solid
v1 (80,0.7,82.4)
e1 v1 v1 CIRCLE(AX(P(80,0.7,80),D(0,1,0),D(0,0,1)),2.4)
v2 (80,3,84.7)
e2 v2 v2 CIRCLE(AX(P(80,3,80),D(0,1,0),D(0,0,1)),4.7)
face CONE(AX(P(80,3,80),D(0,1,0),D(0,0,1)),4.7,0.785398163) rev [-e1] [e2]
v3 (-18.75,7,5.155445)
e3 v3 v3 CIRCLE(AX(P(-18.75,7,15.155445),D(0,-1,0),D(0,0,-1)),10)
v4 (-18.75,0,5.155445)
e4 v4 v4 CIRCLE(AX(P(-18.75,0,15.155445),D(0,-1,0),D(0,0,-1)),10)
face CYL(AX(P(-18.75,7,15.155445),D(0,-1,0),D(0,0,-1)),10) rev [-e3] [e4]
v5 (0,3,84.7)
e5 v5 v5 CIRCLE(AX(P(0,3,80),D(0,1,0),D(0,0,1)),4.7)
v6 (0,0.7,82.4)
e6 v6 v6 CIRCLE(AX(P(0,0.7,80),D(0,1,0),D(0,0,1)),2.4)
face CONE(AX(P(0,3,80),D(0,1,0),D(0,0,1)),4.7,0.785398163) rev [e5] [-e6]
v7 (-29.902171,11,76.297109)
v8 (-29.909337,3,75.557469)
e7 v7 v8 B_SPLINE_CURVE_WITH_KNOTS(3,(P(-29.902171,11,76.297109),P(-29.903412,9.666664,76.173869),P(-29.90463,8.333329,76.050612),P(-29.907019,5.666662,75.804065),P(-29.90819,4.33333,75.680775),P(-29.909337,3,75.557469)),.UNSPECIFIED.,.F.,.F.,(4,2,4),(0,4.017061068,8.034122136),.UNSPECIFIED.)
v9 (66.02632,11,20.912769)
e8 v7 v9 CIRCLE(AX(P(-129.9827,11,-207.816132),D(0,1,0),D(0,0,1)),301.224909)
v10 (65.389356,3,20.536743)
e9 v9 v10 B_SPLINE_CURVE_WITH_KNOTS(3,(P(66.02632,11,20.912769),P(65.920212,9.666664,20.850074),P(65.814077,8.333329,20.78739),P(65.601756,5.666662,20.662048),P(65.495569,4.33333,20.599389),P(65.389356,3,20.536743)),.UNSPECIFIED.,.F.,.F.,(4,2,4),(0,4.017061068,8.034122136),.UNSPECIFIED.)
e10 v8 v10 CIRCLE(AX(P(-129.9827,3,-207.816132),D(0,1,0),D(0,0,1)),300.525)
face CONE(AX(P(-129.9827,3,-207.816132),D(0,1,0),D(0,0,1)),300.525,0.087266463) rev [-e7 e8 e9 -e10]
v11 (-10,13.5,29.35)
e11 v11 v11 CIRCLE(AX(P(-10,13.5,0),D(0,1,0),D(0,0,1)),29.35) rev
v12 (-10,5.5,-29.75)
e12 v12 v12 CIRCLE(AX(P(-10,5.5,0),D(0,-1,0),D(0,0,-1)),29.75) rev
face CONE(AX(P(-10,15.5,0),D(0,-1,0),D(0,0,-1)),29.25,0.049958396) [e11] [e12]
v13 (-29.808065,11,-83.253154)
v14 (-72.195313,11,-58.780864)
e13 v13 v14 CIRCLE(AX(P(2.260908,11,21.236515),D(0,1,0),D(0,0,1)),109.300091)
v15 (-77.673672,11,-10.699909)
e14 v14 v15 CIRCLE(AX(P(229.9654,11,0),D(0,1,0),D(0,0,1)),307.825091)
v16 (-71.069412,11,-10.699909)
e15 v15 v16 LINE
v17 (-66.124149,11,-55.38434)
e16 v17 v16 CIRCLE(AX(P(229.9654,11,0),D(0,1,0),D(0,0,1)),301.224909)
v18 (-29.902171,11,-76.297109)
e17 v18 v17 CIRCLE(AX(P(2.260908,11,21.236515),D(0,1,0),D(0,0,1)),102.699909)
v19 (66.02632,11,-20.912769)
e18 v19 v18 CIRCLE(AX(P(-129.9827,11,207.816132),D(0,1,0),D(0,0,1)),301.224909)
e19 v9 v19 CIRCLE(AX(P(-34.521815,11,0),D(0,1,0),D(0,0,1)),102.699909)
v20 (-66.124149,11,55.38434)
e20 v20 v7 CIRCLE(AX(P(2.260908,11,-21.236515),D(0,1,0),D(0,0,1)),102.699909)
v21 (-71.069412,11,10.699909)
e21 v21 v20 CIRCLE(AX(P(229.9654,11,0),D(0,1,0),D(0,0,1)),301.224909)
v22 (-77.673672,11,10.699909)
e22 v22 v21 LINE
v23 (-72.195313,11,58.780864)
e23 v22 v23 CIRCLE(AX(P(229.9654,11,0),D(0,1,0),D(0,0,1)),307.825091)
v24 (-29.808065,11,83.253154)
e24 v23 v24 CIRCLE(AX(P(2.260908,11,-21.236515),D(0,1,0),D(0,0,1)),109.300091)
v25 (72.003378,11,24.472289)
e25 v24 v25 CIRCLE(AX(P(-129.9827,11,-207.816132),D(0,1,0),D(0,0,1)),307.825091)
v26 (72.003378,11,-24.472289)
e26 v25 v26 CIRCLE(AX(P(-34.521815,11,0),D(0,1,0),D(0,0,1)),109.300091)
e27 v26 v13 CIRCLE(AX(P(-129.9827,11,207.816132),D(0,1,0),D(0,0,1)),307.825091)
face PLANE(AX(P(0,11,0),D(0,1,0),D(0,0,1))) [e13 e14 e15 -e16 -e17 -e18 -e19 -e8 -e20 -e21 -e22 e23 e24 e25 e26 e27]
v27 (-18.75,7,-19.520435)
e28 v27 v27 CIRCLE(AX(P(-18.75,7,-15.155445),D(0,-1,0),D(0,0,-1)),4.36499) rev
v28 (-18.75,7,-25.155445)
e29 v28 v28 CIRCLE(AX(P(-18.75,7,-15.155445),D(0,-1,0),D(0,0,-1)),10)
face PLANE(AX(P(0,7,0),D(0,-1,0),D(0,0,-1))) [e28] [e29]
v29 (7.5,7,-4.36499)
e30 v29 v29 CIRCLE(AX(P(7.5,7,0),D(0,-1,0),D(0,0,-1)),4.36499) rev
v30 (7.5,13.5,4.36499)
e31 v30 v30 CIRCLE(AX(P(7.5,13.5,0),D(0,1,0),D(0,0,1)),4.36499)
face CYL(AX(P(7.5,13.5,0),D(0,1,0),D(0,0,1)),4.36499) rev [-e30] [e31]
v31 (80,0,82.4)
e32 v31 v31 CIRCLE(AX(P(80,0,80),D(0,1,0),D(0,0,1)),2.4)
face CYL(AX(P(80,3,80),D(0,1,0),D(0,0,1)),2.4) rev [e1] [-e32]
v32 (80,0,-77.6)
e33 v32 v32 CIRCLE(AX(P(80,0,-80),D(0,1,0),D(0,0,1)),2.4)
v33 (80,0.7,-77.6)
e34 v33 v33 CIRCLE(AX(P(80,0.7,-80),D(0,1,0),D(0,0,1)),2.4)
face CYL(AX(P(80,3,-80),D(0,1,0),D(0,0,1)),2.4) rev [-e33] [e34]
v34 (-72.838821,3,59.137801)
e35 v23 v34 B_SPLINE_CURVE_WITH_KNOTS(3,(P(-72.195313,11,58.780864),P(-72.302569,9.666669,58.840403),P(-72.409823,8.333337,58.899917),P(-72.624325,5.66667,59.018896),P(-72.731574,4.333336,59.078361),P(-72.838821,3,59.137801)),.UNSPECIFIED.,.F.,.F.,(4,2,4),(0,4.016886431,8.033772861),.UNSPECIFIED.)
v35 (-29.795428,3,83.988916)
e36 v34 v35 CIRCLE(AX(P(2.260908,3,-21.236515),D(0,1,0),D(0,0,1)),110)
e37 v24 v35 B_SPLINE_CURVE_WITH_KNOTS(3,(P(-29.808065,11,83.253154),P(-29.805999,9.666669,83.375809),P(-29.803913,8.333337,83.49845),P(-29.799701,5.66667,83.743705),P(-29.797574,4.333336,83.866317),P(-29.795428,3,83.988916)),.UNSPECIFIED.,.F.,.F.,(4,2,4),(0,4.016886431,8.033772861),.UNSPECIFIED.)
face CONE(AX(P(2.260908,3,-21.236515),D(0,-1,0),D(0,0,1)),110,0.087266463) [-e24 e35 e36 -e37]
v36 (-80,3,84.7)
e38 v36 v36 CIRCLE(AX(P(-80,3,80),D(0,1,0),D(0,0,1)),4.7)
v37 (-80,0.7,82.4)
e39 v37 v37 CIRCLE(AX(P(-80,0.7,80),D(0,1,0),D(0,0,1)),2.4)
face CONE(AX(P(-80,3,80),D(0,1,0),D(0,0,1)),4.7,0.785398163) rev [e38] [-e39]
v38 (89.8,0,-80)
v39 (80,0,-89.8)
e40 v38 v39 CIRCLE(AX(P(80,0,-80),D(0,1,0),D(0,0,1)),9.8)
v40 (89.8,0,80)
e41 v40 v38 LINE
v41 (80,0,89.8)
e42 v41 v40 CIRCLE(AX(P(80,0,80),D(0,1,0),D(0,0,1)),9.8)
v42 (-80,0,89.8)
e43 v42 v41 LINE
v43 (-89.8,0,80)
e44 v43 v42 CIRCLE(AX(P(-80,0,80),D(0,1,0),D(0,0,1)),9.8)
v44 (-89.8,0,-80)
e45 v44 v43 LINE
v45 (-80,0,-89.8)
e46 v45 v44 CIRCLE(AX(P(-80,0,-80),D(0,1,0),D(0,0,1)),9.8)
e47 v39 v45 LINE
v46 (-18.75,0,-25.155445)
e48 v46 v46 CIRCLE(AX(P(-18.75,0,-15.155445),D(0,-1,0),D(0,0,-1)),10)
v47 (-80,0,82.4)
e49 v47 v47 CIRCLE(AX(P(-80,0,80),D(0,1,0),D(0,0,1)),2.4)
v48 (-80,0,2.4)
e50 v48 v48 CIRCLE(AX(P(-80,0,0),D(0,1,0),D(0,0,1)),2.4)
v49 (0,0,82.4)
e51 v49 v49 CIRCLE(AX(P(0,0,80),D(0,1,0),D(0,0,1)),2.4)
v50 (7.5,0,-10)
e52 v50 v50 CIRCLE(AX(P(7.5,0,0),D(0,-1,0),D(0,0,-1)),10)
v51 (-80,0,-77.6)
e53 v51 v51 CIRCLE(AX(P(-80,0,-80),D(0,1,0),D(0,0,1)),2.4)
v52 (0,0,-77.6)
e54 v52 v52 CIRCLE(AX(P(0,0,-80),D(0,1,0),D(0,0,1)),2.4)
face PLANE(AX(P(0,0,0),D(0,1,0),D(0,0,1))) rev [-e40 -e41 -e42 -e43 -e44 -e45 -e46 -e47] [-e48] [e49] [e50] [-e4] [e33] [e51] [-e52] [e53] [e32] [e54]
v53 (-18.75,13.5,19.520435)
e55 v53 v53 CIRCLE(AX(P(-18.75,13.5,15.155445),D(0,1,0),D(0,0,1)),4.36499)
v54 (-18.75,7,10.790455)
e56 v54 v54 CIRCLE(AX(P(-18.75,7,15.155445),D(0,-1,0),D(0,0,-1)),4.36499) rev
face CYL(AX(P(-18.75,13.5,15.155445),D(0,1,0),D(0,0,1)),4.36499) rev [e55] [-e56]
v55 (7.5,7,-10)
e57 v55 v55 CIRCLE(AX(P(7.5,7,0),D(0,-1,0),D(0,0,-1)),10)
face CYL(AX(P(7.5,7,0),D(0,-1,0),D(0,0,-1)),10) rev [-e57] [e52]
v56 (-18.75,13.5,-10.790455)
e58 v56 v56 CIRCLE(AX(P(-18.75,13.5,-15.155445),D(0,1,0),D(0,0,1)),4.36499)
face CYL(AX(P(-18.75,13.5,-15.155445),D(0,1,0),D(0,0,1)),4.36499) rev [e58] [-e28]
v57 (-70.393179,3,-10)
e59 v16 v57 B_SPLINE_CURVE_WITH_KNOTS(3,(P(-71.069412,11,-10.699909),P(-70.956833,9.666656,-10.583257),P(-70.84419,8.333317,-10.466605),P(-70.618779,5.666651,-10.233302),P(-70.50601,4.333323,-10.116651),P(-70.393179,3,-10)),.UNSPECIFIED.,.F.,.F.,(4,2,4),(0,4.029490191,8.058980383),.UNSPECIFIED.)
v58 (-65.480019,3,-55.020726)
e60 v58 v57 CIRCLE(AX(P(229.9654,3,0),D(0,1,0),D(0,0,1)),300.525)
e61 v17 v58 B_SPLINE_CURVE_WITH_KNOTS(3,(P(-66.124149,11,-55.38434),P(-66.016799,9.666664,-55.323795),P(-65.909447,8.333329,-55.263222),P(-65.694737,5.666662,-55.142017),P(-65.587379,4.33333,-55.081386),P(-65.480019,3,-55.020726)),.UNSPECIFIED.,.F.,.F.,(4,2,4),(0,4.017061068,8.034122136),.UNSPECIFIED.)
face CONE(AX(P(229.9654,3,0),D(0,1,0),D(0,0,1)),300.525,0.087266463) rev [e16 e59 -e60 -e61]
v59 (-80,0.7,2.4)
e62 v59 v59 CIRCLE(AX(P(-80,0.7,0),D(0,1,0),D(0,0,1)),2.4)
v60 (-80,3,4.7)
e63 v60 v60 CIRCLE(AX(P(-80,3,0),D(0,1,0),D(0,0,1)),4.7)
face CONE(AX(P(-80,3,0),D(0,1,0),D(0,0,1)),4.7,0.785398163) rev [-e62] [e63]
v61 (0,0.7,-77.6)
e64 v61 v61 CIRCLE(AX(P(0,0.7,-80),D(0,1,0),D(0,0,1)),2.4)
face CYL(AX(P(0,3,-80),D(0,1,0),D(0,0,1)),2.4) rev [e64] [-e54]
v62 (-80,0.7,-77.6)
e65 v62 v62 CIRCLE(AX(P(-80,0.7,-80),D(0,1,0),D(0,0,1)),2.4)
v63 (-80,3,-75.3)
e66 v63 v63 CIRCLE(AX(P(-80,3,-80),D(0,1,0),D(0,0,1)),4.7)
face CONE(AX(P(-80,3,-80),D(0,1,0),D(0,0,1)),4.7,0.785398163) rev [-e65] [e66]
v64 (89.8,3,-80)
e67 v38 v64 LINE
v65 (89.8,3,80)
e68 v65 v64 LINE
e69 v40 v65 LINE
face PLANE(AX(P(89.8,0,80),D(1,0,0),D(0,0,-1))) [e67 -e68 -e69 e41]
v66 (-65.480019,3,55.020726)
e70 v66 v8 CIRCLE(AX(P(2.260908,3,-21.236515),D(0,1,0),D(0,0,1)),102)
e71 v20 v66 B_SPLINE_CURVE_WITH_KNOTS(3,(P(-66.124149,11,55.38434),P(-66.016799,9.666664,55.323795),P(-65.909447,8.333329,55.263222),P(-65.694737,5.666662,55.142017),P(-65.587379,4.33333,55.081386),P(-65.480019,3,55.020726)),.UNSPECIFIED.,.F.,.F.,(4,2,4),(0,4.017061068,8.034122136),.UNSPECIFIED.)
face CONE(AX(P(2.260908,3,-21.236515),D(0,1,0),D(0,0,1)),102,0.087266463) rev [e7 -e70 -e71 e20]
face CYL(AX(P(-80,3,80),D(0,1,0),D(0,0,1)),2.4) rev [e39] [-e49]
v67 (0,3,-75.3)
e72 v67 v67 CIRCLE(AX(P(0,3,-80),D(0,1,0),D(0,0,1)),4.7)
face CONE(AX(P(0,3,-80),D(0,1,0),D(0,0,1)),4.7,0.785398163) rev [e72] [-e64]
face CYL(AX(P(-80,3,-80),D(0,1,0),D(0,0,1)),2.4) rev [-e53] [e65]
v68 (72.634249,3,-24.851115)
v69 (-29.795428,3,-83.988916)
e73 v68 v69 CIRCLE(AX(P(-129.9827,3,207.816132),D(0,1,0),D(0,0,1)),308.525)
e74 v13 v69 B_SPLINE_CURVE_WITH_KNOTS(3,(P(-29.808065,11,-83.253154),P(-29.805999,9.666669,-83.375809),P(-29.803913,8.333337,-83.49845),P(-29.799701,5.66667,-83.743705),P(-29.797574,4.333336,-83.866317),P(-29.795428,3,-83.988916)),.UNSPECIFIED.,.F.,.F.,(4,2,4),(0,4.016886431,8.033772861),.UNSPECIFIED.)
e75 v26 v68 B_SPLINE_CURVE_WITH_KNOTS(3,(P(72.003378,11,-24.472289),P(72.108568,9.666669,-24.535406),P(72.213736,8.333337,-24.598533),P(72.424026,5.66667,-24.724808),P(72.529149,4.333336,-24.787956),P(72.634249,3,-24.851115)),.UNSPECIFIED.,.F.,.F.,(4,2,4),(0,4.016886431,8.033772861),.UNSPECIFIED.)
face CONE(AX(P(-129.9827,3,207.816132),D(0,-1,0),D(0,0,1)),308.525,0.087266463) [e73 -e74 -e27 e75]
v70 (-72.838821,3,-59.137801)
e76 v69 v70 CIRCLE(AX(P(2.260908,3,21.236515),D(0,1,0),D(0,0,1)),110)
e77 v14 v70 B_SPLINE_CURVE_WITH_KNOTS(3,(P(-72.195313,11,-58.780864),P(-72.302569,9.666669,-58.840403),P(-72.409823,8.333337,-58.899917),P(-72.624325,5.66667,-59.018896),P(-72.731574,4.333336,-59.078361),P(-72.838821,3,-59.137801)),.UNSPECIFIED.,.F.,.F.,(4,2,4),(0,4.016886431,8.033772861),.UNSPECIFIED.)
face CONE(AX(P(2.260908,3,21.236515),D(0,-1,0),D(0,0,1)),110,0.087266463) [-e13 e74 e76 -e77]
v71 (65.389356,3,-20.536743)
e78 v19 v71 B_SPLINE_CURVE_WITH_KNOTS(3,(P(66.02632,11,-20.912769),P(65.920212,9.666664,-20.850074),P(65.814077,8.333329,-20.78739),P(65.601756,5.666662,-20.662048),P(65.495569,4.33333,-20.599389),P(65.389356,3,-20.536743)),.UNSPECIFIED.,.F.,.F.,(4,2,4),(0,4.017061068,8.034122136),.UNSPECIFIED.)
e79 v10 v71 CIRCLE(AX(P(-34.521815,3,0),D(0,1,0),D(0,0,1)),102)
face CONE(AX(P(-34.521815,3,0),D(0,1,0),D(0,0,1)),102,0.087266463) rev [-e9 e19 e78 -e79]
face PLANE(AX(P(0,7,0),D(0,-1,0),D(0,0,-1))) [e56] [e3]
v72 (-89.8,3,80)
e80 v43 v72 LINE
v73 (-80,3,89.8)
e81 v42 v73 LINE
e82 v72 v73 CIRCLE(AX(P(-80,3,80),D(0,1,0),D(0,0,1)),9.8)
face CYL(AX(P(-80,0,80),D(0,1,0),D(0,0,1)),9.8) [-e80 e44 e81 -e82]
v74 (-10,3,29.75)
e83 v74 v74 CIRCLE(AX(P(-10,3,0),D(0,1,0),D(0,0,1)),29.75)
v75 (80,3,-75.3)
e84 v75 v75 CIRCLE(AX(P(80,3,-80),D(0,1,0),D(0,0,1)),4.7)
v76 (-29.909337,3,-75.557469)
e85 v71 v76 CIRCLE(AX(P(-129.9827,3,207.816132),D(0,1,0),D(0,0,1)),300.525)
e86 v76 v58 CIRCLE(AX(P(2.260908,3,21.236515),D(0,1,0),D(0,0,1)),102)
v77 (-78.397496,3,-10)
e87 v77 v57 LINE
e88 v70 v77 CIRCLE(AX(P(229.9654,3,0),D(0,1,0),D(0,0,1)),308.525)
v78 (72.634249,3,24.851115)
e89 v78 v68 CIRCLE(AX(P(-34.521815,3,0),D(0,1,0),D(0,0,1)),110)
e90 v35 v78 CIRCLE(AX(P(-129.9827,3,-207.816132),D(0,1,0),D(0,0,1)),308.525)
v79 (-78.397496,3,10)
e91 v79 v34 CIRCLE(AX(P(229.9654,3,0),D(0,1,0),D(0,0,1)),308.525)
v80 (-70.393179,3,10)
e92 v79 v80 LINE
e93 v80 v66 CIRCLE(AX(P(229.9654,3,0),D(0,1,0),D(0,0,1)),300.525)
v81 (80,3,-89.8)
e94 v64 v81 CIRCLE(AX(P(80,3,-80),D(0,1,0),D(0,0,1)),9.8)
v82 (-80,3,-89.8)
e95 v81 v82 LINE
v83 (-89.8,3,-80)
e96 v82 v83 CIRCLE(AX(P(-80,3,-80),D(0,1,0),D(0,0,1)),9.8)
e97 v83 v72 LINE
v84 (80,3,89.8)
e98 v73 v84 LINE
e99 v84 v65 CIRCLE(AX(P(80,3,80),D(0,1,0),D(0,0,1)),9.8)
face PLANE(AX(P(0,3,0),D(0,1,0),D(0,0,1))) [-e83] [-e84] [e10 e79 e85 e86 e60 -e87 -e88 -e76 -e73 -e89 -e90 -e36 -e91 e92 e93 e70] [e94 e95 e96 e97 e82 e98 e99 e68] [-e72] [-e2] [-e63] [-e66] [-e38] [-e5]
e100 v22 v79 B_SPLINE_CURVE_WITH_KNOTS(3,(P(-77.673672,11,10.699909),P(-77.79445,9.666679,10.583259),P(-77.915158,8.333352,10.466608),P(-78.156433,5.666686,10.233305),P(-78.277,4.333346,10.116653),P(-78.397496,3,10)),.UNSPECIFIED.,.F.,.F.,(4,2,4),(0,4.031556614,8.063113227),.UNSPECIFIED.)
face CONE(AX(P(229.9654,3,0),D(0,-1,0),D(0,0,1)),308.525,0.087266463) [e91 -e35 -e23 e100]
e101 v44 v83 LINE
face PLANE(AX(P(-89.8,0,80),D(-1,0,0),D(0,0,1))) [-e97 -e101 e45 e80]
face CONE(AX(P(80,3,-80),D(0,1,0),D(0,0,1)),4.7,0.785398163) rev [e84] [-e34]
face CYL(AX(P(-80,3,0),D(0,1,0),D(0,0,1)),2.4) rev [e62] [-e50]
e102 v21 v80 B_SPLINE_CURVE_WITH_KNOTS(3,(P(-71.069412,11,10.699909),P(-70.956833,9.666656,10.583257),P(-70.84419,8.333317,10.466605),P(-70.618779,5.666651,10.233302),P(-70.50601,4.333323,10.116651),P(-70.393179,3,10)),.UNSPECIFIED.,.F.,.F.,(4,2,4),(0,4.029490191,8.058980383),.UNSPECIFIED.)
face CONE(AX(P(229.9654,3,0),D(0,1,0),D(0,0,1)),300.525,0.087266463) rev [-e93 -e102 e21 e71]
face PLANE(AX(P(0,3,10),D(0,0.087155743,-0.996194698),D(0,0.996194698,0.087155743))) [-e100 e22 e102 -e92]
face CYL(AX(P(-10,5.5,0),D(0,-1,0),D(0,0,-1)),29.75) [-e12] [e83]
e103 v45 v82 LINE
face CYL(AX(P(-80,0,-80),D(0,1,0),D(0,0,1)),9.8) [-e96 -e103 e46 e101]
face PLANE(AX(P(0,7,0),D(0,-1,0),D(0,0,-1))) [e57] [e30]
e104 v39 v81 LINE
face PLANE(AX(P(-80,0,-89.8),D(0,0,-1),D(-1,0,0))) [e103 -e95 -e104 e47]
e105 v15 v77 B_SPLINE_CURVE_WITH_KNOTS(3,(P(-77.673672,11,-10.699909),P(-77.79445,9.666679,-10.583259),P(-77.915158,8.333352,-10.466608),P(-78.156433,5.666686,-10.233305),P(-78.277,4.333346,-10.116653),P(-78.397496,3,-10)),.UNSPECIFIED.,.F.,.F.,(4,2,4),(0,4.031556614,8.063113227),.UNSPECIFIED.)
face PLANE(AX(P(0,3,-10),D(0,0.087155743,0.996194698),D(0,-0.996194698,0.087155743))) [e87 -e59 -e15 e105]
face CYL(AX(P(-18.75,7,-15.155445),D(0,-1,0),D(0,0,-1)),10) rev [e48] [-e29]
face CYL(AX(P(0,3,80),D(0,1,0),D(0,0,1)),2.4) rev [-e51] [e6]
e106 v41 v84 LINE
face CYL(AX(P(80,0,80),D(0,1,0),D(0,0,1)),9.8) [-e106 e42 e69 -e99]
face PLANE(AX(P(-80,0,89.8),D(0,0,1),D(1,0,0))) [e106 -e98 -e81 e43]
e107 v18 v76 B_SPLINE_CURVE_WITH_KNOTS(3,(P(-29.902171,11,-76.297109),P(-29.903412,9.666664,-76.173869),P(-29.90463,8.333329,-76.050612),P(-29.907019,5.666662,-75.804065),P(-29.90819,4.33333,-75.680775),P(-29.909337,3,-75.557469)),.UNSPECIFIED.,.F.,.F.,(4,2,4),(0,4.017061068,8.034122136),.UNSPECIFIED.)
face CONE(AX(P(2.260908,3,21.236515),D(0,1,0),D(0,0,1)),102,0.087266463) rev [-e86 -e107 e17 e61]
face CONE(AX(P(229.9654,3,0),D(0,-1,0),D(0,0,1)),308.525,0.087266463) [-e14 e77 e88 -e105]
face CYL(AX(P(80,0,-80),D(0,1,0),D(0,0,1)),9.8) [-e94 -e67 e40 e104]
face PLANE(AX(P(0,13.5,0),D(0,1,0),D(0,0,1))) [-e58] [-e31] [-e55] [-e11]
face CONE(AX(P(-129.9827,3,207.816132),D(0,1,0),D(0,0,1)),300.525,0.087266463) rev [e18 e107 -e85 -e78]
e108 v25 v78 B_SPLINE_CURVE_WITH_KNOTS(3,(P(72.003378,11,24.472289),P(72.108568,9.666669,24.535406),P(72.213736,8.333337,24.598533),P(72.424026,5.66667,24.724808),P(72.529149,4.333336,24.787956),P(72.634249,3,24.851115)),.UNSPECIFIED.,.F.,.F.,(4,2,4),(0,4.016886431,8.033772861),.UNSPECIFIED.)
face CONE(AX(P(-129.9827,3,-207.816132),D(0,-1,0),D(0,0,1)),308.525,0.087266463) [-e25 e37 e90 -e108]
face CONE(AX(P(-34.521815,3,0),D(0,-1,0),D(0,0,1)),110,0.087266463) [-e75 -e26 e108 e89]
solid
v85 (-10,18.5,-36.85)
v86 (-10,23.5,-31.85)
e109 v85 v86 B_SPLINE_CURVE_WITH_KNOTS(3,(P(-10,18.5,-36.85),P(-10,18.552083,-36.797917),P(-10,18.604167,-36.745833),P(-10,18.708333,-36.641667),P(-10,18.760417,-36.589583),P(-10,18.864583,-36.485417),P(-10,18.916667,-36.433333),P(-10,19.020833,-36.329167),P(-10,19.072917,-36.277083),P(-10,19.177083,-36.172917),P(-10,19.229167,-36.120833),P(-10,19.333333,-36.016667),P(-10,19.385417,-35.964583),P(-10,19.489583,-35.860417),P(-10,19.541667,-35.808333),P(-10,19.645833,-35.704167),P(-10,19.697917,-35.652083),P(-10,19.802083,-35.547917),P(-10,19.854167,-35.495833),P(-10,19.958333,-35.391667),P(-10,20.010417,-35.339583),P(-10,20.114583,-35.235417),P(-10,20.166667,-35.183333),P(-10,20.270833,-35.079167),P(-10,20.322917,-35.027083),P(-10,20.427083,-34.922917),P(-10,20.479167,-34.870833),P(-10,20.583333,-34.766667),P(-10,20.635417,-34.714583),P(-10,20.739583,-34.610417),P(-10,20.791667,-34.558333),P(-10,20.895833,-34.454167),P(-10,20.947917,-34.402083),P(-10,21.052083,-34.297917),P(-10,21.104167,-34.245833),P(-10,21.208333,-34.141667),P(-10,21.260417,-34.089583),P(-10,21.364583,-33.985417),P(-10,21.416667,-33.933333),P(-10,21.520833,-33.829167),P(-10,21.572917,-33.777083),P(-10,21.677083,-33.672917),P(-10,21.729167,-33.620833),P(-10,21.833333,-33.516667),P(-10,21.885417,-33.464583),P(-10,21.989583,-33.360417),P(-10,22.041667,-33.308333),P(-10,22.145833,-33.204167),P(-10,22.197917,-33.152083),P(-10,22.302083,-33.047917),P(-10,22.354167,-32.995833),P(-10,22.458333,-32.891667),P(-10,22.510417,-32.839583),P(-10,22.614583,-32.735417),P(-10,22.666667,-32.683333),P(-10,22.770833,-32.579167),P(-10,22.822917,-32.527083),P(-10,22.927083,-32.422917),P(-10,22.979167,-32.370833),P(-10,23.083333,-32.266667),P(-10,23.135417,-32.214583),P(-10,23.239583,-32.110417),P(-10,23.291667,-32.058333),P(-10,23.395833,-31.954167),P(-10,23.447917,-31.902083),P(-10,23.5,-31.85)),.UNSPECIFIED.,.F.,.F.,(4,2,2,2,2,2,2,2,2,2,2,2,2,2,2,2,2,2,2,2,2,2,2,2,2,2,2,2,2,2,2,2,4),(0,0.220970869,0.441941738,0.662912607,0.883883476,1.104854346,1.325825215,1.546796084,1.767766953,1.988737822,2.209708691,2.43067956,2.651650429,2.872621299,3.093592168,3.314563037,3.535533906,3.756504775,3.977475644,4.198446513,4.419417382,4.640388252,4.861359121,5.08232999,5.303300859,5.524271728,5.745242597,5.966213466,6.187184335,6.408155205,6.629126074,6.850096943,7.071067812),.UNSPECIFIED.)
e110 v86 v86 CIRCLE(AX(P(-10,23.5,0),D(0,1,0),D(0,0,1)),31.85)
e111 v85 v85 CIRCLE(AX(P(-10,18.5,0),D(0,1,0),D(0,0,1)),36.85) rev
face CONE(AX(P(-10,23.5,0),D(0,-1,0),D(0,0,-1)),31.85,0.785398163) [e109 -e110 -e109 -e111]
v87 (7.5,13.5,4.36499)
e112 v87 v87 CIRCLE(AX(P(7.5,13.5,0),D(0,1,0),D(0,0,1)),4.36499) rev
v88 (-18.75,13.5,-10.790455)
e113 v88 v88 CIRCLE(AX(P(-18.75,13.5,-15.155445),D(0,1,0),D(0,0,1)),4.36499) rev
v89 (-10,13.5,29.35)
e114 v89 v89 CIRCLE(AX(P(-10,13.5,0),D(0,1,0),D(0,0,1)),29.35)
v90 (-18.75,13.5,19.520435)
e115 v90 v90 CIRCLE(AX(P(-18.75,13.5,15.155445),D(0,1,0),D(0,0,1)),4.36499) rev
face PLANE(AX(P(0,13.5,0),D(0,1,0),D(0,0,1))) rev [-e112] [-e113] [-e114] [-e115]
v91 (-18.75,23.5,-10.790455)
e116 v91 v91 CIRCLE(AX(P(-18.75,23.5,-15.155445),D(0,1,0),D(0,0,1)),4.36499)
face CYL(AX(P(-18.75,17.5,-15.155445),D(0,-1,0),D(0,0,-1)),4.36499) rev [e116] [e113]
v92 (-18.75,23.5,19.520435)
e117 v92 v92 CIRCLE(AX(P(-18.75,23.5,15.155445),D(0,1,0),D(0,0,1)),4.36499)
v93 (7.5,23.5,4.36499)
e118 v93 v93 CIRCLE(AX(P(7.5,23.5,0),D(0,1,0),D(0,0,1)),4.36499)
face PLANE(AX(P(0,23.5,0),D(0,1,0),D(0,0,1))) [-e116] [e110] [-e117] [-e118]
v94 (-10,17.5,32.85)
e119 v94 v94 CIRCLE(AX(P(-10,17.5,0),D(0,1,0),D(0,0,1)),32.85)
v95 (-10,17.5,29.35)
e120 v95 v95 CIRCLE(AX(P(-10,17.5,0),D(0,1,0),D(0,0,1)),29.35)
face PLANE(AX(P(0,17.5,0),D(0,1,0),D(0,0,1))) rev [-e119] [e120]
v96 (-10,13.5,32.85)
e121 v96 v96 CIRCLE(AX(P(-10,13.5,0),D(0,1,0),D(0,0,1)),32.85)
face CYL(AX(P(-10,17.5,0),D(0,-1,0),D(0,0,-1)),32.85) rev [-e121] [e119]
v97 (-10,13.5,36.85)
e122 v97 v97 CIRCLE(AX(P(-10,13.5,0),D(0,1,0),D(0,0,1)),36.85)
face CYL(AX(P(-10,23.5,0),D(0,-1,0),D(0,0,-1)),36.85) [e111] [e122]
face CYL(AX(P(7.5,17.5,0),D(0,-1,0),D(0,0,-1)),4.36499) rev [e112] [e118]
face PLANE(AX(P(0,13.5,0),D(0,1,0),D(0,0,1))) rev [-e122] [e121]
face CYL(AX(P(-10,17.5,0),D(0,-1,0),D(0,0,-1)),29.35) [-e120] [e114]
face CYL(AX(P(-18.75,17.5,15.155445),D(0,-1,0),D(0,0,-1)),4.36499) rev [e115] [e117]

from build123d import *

# Parameters (mm, degrees)
SKETCH1_W                = 180
SKETCH1_H                = 180
SKETCH1_W_2              = 160
SKETCH1_H_2              = 160
SKETCH1_W_3              = 140
SKETCH1_H_3              = 140
BOSS_EXTRUDE1_DEPTH      = 3
SKETCH1_3_W              = 140
SKETCH1_3_H              = 140
BOSS_EXTRUDE2_DEPTH      = 5
SKETCH6_R                = 4.7
BOSS_EXTRUDE4_DEPTH      = 8
BOSS_EXTRUDE5_DEPTH      = 8
BOSS_EXTRUDE5_DRAFT      = 5
CUT_EXTRUDE1_START       = -5
SKETCH12_R               = 4.7
CUT_EXTRUDE1_DEPTH       = 5
SKETCH13_R               = 29.75
BOSS_EXTRUDE6_DEPTH      = 2.5
SKETCH14_R               = 29.75
SKETCH16_R               = 29.25
CUT_EXTRUDE2_START       = -2
CUT_EXTRUDE2_OUTLINE_R   = 34.25
CUT_EXTRUDE2_DEPTH       = 2
FILLET1_R                = 10
SKETCH19_W               = 140
SKETCH19_H               = 140
CUT_EXTRUDE3_DEPTH       = 5
F_5_16_CLEARANCE_HOLE1_D = 8.72998
SKETCH24_R               = 10
SKETCH24_R_2             = 4.36499
CUT_EXTRUDE4_DEPTH       = 7
CUT_EXTRUDE5_DEPTH       = 128.711589146
SKETCH26_R               = 29.35
SKETCH26_R_2             = 4.36499
BOSS_EXTRUDE7_DEPTH      = 4
SKETCH26_R_3             = 36.85
SKETCH26_R_4             = 32.85
BOSS_EXTRUDE7_2_DEPTH    = 4
SKETCH27_R               = 36.85
SKETCH27_R_2             = 32.85
SKETCH27_R_3             = 29.35
SKETCH27_R_4             = 4.36499
BOSS_EXTRUDE8_DEPTH      = 6
CHAMFER1_SIZE            = 5


# Read off the part's stored shape, not the designer's step: CSK for M4 Flat Head Machine Screw1, Cut-Extrude2
with BuildPart() as part:
    # Sketch1 → Boss-Extrude1 (new body)
    # profile 1 of 3: a face of its own
    with BuildSketch(Plane(origin=(0, 0, 0), x_dir=(1, 0, 0), z_dir=(0, 1, 0))):
        Rectangle(SKETCH1_W, SKETCH1_H)
        Rectangle(SKETCH1_W_2, SKETCH1_H_2, mode=Mode.SUBTRACT)
    # profile 2 of 3: a face of its own
    with BuildSketch(Plane(origin=(0, 0, 0), x_dir=(1, 0, 0), z_dir=(0, 1, 0))):
        Rectangle(SKETCH1_W_2, SKETCH1_H_2)
        Rectangle(SKETCH1_W_3, SKETCH1_H_3, mode=Mode.SUBTRACT)
    # profile 3 of 3: a face of its own
    with BuildSketch(Plane(origin=(0, 0, 0), x_dir=(1, 0, 0), z_dir=(0, 1, 0))):
        Rectangle(SKETCH1_W_3, SKETCH1_H_3)
    extrude(amount=BOSS_EXTRUDE1_DEPTH)

    # Sketch1<3> → Boss-Extrude2 (add)
    with BuildSketch(Plane(origin=(0, 0, 0), x_dir=(1, 0, 0), z_dir=(0, 1, 0))):
        Rectangle(SKETCH1_3_W, SKETCH1_3_H)
    extrude(amount=-BOSS_EXTRUDE2_DEPTH)

    # CSK for M4 Flat Head Machine Screw1 outl → CSK for M4 Flat Head Machine Screw1 (revolve, cut)
    with BuildSketch(Plane(origin=(-80, 0, 0), x_dir=(1, 0, 0), z_dir=(0, 0, 1))):
        Polygon((0, 0), (2.4, 0), (2.4, 0.7), (4.7, 3), (0, 3), align=None)
    revolve(axis=Axis((-80, 0, 0), (0, 1, 0)), mode=Mode.SUBTRACT)

    # CSK for M4 Flat Head Machine Screw1 2 ou → CSK for M4 Flat Head Machine Screw1 2 (revolve, cut)
    with BuildSketch(Plane.XY.offset(80)):
        Polygon((0, 0), (2.4, 0), (2.4, 0.7), (4.7, 3), (0, 3), align=None)
    revolve(axis=Axis((0, 0, 80), (0, 1, 0)), mode=Mode.SUBTRACT)

    # CSK for M4 Flat Head Machine Screw1 3 ou → CSK for M4 Flat Head Machine Screw1 3 (revolve, cut)
    with BuildSketch(Plane(origin=(80, 0, 0), x_dir=(1, 0, 0), z_dir=(0, 0, 1))):
        Polygon((0, 0), (2.4, 0), (2.4, 0.7), (4.7, 3), (0, 3), align=None)
    revolve(axis=Axis((80, 0, 0), (0, 1, 0)), mode=Mode.SUBTRACT)

    # CSK for M4 Flat Head Machine Screw1 4 ou → CSK for M4 Flat Head Machine Screw1 4 (revolve, cut)
    with BuildSketch(Plane.XY.offset(-80)):
        Polygon((0, 0), (2.4, 0), (2.4, 0.7), (4.7, 3), (0, 3), align=None)
    revolve(axis=Axis((0, 0, -80), (0, 1, 0)), mode=Mode.SUBTRACT)

    # CSK for M4 Flat Head Machine Screw1 5 ou → CSK for M4 Flat Head Machine Screw1 5 (revolve, cut)
    with BuildSketch(Plane(origin=(-80, 0, 80), x_dir=(1, 0, 0), z_dir=(0, 0, 1))):
        Polygon((0, 0), (2.4, 0), (2.4, 0.7), (4.7, 3), (0, 3), align=None)
    revolve(axis=Axis((-80, 0, 80), (0, 1, 0)), mode=Mode.SUBTRACT)

    # CSK for M4 Flat Head Machine Screw1 6 ou → CSK for M4 Flat Head Machine Screw1 6 (revolve, cut)
    with BuildSketch(Plane(origin=(80, 0, -80), x_dir=(1, 0, 0), z_dir=(0, 0, 1))):
        Polygon((0, 0), (2.4, 0), (2.4, 0.7), (4.7, 3), (0, 3), align=None)
    revolve(axis=Axis((80, 0, -80), (0, 1, 0)), mode=Mode.SUBTRACT)

    # CSK for M4 Flat Head Machine Screw1 7 ou → CSK for M4 Flat Head Machine Screw1 7 (revolve, cut)
    with BuildSketch(Plane(origin=(80, 0, 80), x_dir=(1, 0, 0), z_dir=(0, 0, 1))):
        Polygon((0, 0), (2.4, 0), (2.4, 0.7), (4.7, 3), (0, 3), align=None)
    revolve(axis=Axis((80, 0, 80), (0, 1, 0)), mode=Mode.SUBTRACT)

    # CSK for M4 Flat Head Machine Screw1 8 ou → CSK for M4 Flat Head Machine Screw1 8 (revolve, cut)
    with BuildSketch(Plane(origin=(-80, 0, -80), x_dir=(1, 0, 0), z_dir=(0, 0, 1))):
        Polygon((0, 0), (2.4, 0), (2.4, 0.7), (4.7, 3), (0, 3), align=None)
    revolve(axis=Axis((-80, 0, -80), (0, 1, 0)), mode=Mode.SUBTRACT)

    # CSK for M4 Flat Head Machine Screw1 9 ou → CSK for M4 Flat Head Machine Screw1 9 (revolve, cut)
    with BuildSketch(Plane.XY):
        Polygon((0, -5), (2.4, -5), (2.4, 0.7), (4.7, 3), (0, 3), align=None)
    revolve(axis=Axis((0, 0, 0), (0, 1, 0)), mode=Mode.SUBTRACT)

    # Sketch6 → Boss-Extrude4 (add, through all)
    with BuildSketch(Plane(origin=(0, 3, 0), x_dir=(1, 0, 0), z_dir=(0, 1, 0))):
        with Locations(Location((80, 0, 0), (0, 0, 270))):
            Circle(SKETCH6_R)
        Circle(SKETCH6_R)
    extrude(amount=-BOSS_EXTRUDE4_DEPTH)


with BuildPart() as boss_extrude5_tool:
    # Sketch10 → Boss-Extrude5 (with draft: the straight prism first)
    with BuildSketch(Plane(origin=(0, 3, 0), x_dir=(1, 0, 0), z_dir=(0, 1, 0))):
        with BuildLine():
            Line((-70.393178849, -10), (-78.397496431, -10))
            ThreePointArc((-78.397496431, -10), (-76.604236916, -34.68045004), (-72.838821124, -59.137801445))
            ThreePointArc((-72.838821124, -59.137801445), (-52.739092363, -74.026279442), (-29.795427813, -83.98891616))
            ThreePointArc((-29.795427813, -83.98891616), (24.279800219, -59.374355653), (72.634248938, -24.851114715))
            ThreePointArc((72.634248938, -24.851114715), (75.478184725, 0), (72.634248938, 24.851114715))
            ThreePointArc((72.634248938, 24.851114715), (24.279800219, 59.374355653), (-29.795427813, 83.98891616))
            ThreePointArc((-29.795427813, 83.98891616), (-52.739092363, 74.026279442), (-72.838821124, 59.137801445))
            ThreePointArc((-72.838821124, 59.137801445), (-76.604236916, 34.68045004), (-78.397496431, 10))
            Line((-78.397496431, 10), (-70.393178849, 10))
            ThreePointArc((-70.393178849, 10), (-68.785863401, 32.603044383), (-65.480018889, 55.020726474))
            ThreePointArc((-65.480018889, 55.020726474), (-48.739092363, 67.098076211), (-29.909337417, 75.557468997))
            ThreePointArc((-29.909337417, 75.557468997), (20.279800219, 52.446152423), (65.389356306, 20.536742523))
            ThreePointArc((65.389356306, 20.536742523), (67.478184725, 0), (65.389356306, -20.536742523))
            ThreePointArc((65.389356306, -20.536742523), (20.279800219, -52.446152423), (-29.909337417, -75.557468997))
            ThreePointArc((-29.909337417, -75.557468997), (-48.739092363, -67.098076211), (-65.480018889, -55.020726474))
            ThreePointArc((-65.480018889, -55.020726474), (-68.785863401, -32.603044383), (-70.393178849, -10))
        make_face()
    extrude(amount=BOSS_EXTRUDE5_DEPTH)
    # Boss-Extrude5: the draft: its side faces are tilted about the plane it starts from
    boss_extrude5_sides = [boss_extrude5_tool.faces().sort_by_distance(p)[0] for p in [
        (-74.39533764, 7, 10),
        (-76.604236916, 7, 34.68045004),
        (-52.739092363, 7, 74.026279442),
        (24.279800219, 7, 59.374355653),
        (75.478184725, 7, 0),
        (24.279800219, 7, -59.374355653),
        (-52.739092363, 7, -74.026279442),
        (-76.604236916, 7, -34.68045004),
        (-74.39533764, 7, -10),
        (-68.785863401, 7, -32.603044383),
        (-48.739092363, 7, -67.098076211),
        (20.279800219, 7, -52.446152423),
        (67.478184725, 7, 0),
        (20.279800219, 7, 52.446152423),
        (-48.739092363, 7, 67.098076211),
        (-68.785863401, 7, 32.603044383),
    ]]
    draft(boss_extrude5_sides, Plane(origin=(0, 3, 0), x_dir=(1, 0, 0), z_dir=(0, 1, 0)), BOSS_EXTRUDE5_DRAFT)


with BuildPart() as part_1:
    add(part.part)

    # Boss-Extrude5: add boss_extrude5_tool
    add(boss_extrude5_tool.part)

    # Sketch12 → Cut-Extrude1 (cut)
    with BuildSketch(Plane.XZ.offset(5).offset(CUT_EXTRUDE1_START)):
        with Locations((80, 0)):
            Circle(SKETCH12_R)
    extrude(amount=CUT_EXTRUDE1_DEPTH, mode=Mode.SUBTRACT)

    # Sketch13 → Boss-Extrude6 (add)
    with BuildSketch(Plane(origin=(0, 3, 0), x_dir=(1, 0, 0), z_dir=(0, 1, 0))):
        with Locations(Location((-10, 0, 0), (0, 0, 270))):
            Circle(SKETCH13_R)
    extrude(amount=BOSS_EXTRUDE6_DEPTH)

    # Sketch14 → Loft1 section 0
    with BuildSketch(Plane(origin=(0, 5.5, 0), x_dir=(1, 0, 0), z_dir=(0, 1, 0))):
        with Locations((-10, 0)):
            Circle(SKETCH14_R)
    # Sketch16 → Loft1 section 1
    with BuildSketch(Plane(origin=(0, 15.5, 0), x_dir=(1, 0, 0), z_dir=(0, 1, 0))):
        with Locations((-10, 0)):
            Circle(SKETCH16_R)
    loft()

    # Cut-Extrude2 outline → Cut-Extrude2 (cut)
    with BuildSketch(Plane(origin=(0, 15.5, 0), x_dir=(1, 0, 0), z_dir=(0, 1, 0)).offset(CUT_EXTRUDE2_START)):
        with Locations((-10, 0)):
            Circle(CUT_EXTRUDE2_OUTLINE_R)
    extrude(amount=CUT_EXTRUDE2_DEPTH, mode=Mode.SUBTRACT)

    # Fillet1
    fillet1_edges = [part_1.edges().sort_by_distance(p)[0] for p in [
        (-90, 1.5, 90),
        (-90, 1.5, -90),
        (90, 1.5, -90),
        (90, 1.5, 90),
    ]]
    fillet(fillet1_edges, radius=FILLET1_R)

    # Sketch19 → Cut-Extrude3 (cut)
    with BuildSketch(Plane.XZ.offset(5)):
        Rectangle(SKETCH19_W, SKETCH19_H)
    extrude(amount=-CUT_EXTRUDE3_DEPTH, mode=Mode.SUBTRACT)

    # 5/16 Clearance Hole1 (through all)
    with Locations(Plane(origin=(0, 13.5, 0), x_dir=(1, 0, 0), z_dir=(0, 1, 0))):
        with Locations((-18.75, 15.155444566), (7.5, 0), (-18.75, -15.155444566)):
            Hole(F_5_16_CLEARANCE_HOLE1_D / 2)

    # Sketch24 → Cut-Extrude4 (cut)
    # profile 1 of 6: a face of its own
    with BuildSketch(Plane.XZ):
        with Locations(Location((-18.75, 15.155444566, 0), (0, 0, 270))):
            Circle(SKETCH24_R)
        with Locations(Location((-18.75, 15.155444566, 0), (0, 0, 90))):
            Circle(SKETCH24_R_2, mode=Mode.SUBTRACT)
    # profile 2 of 6: a face of its own
    with BuildSketch(Plane.XZ):
        with Locations(Location((7.5, 0, 0), (0, 0, 270))):
            Circle(SKETCH24_R)
        with Locations(Location((7.5, 0, 0), (0, 0, 90))):
            Circle(SKETCH24_R_2, mode=Mode.SUBTRACT)
    # profile 3 of 6: a face of its own
    with BuildSketch(Plane.XZ):
        with Locations(Location((-18.75, -15.155444566, 0), (0, 0, 270))):
            Circle(SKETCH24_R)
        with Locations(Location((-18.75, -15.155444566, 0), (0, 0, 90))):
            Circle(SKETCH24_R_2, mode=Mode.SUBTRACT)
    # profile 4 of 6: a face of its own
    with BuildSketch(Plane.XZ):
        with Locations(Location((-18.75, -15.155444566, 0), (0, 0, 90))):
            Circle(SKETCH24_R_2)
    # profile 5 of 6: a face of its own
    with BuildSketch(Plane.XZ):
        with Locations(Location((-18.75, 15.155444566, 0), (0, 0, 90))):
            Circle(SKETCH24_R_2)
    # profile 6 of 6: a face of its own
    with BuildSketch(Plane.XZ):
        with Locations(Location((7.5, 0, 0), (0, 0, 90))):
            Circle(SKETCH24_R_2)
    extrude(amount=-CUT_EXTRUDE4_DEPTH, mode=Mode.SUBTRACT)

    # Sketch25 → Cut-Extrude5 (cut, through all)
    with BuildSketch(Plane(origin=(0, 3, 0), x_dir=(1, 0, 0), z_dir=(0, 1, 0))):
        with BuildLine():
            Line((90, -80), (90, 80))
            ThreePointArc((90, 80), (87.071067812, 87.071067812), (80, 90))
            Line((80, 90), (-80, 90))
            ThreePointArc((-80, 90), (-87.071067812, 87.071067812), (-90, 80))
            Line((-90, 80), (-90, -80))
            ThreePointArc((-90, -80), (-87.071067812, -87.071067812), (-80, -90))
            Line((-80, -90), (80, -90))
            ThreePointArc((80, -90), (87.071067812, -87.071067812), (90, -80))
        make_face()
        with BuildLine():
            Line((-80, 89.8), (80, 89.8))
            ThreePointArc((80, 89.8), (86.929646456, 86.929646456), (89.8, 80))
            Line((89.8, 80), (89.8, -80))
            ThreePointArc((89.8, -80), (86.929646456, -86.929646456), (80, -89.8))
            Line((80, -89.8), (-80, -89.8))
            ThreePointArc((-80, -89.8), (-86.929646456, -86.929646456), (-89.8, -80))
            Line((-89.8, -80), (-89.8, 80))
            ThreePointArc((-89.8, 80), (-86.929646456, 86.929646456), (-80, 89.8))
        make_face(mode=Mode.SUBTRACT)
    extrude(amount=-CUT_EXTRUDE5_DEPTH, mode=Mode.SUBTRACT)


with BuildPart() as body_2:
    # Sketch26 → Boss-Extrude7 (new body)
    with BuildSketch(Plane(origin=(0, 13.5, 0), x_dir=(1, 0, 0), z_dir=(0, 1, 0))):
        with Locations(Location((-10, 0, 0), (0, 0, 270))):
            Circle(SKETCH26_R)
        with Locations(Location((-18.75, -15.155444566, 0), (0, 0, 270))):
            Circle(SKETCH26_R_2, mode=Mode.SUBTRACT)
        with Locations(Location((7.5, 0, 0), (0, 0, 270))):
            Circle(SKETCH26_R_2, mode=Mode.SUBTRACT)
        with Locations(Location((-18.75, 15.155444566, 0), (0, 0, 270))):
            Circle(SKETCH26_R_2, mode=Mode.SUBTRACT)
    extrude(amount=BOSS_EXTRUDE7_DEPTH)



with BuildPart() as body_3:
    # Sketch26 → Boss-Extrude7 2 (new body)
    with BuildSketch(Plane(origin=(0, 13.5, 0), x_dir=(1, 0, 0), z_dir=(0, 1, 0))):
        with Locations(Location((-10, 0, 0), (0, 0, 270))):
            Circle(SKETCH26_R_3)
        with Locations(Location((-10, 0, 0), (0, 0, 270))):
            Circle(SKETCH26_R_4, mode=Mode.SUBTRACT)
    extrude(amount=BOSS_EXTRUDE7_2_DEPTH)


with BuildPart() as body_2_1:
    add(body_2.part)

    add(body_3.part)  # Boss-Extrude8 merges body 3
    # Sketch27 → Boss-Extrude8 (add)
    # profile 1 of 3: a face of its own
    with BuildSketch(Plane(origin=(0, 17.5, 0), x_dir=(1, 0, 0), z_dir=(0, 1, 0))):
        with Locations(Location((-10, 0, 0), (0, 0, 270))):
            Circle(SKETCH27_R)
        with Locations(Location((-10, 0, 0), (0, 0, 270))):
            Circle(SKETCH27_R_2, mode=Mode.SUBTRACT)
    # profile 2 of 3: a face of its own
    with BuildSketch(Plane(origin=(0, 17.5, 0), x_dir=(1, 0, 0), z_dir=(0, 1, 0))):
        with Locations(Location((-10, 0, 0), (0, 0, 270))):
            Circle(SKETCH27_R_2)
        with Locations(Location((-10, 0, 0), (0, 0, 270))):
            Circle(SKETCH27_R_3, mode=Mode.SUBTRACT)
    # profile 3 of 3: a face of its own
    with BuildSketch(Plane(origin=(0, 17.5, 0), x_dir=(1, 0, 0), z_dir=(0, 1, 0))):
        with Locations(Location((-10, 0, 0), (0, 0, 270))):
            Circle(SKETCH27_R_3)
        with Locations(Location((-18.75, 15.155444566, 0), (0, 0, 270))):
            Circle(SKETCH27_R_4, mode=Mode.SUBTRACT)
        with Locations(Location((-18.75, -15.155444566, 0), (0, 0, 270))):
            Circle(SKETCH27_R_4, mode=Mode.SUBTRACT)
        with Locations(Location((7.5, 0, 0), (0, 0, 270))):
            Circle(SKETCH27_R_4, mode=Mode.SUBTRACT)
    extrude(amount=BOSS_EXTRUDE8_DEPTH)

    # Chamfer1
    chamfer1_edges = [body_2_1.edges().sort_by_distance(p)[0] for p in [
        (-10, 23.5, -36.85),
    ]]
    chamfer(chamfer1_edges, length=CHAMFER1_SIZE)


solid = Compound([part_1.part, body_2_1.part])
